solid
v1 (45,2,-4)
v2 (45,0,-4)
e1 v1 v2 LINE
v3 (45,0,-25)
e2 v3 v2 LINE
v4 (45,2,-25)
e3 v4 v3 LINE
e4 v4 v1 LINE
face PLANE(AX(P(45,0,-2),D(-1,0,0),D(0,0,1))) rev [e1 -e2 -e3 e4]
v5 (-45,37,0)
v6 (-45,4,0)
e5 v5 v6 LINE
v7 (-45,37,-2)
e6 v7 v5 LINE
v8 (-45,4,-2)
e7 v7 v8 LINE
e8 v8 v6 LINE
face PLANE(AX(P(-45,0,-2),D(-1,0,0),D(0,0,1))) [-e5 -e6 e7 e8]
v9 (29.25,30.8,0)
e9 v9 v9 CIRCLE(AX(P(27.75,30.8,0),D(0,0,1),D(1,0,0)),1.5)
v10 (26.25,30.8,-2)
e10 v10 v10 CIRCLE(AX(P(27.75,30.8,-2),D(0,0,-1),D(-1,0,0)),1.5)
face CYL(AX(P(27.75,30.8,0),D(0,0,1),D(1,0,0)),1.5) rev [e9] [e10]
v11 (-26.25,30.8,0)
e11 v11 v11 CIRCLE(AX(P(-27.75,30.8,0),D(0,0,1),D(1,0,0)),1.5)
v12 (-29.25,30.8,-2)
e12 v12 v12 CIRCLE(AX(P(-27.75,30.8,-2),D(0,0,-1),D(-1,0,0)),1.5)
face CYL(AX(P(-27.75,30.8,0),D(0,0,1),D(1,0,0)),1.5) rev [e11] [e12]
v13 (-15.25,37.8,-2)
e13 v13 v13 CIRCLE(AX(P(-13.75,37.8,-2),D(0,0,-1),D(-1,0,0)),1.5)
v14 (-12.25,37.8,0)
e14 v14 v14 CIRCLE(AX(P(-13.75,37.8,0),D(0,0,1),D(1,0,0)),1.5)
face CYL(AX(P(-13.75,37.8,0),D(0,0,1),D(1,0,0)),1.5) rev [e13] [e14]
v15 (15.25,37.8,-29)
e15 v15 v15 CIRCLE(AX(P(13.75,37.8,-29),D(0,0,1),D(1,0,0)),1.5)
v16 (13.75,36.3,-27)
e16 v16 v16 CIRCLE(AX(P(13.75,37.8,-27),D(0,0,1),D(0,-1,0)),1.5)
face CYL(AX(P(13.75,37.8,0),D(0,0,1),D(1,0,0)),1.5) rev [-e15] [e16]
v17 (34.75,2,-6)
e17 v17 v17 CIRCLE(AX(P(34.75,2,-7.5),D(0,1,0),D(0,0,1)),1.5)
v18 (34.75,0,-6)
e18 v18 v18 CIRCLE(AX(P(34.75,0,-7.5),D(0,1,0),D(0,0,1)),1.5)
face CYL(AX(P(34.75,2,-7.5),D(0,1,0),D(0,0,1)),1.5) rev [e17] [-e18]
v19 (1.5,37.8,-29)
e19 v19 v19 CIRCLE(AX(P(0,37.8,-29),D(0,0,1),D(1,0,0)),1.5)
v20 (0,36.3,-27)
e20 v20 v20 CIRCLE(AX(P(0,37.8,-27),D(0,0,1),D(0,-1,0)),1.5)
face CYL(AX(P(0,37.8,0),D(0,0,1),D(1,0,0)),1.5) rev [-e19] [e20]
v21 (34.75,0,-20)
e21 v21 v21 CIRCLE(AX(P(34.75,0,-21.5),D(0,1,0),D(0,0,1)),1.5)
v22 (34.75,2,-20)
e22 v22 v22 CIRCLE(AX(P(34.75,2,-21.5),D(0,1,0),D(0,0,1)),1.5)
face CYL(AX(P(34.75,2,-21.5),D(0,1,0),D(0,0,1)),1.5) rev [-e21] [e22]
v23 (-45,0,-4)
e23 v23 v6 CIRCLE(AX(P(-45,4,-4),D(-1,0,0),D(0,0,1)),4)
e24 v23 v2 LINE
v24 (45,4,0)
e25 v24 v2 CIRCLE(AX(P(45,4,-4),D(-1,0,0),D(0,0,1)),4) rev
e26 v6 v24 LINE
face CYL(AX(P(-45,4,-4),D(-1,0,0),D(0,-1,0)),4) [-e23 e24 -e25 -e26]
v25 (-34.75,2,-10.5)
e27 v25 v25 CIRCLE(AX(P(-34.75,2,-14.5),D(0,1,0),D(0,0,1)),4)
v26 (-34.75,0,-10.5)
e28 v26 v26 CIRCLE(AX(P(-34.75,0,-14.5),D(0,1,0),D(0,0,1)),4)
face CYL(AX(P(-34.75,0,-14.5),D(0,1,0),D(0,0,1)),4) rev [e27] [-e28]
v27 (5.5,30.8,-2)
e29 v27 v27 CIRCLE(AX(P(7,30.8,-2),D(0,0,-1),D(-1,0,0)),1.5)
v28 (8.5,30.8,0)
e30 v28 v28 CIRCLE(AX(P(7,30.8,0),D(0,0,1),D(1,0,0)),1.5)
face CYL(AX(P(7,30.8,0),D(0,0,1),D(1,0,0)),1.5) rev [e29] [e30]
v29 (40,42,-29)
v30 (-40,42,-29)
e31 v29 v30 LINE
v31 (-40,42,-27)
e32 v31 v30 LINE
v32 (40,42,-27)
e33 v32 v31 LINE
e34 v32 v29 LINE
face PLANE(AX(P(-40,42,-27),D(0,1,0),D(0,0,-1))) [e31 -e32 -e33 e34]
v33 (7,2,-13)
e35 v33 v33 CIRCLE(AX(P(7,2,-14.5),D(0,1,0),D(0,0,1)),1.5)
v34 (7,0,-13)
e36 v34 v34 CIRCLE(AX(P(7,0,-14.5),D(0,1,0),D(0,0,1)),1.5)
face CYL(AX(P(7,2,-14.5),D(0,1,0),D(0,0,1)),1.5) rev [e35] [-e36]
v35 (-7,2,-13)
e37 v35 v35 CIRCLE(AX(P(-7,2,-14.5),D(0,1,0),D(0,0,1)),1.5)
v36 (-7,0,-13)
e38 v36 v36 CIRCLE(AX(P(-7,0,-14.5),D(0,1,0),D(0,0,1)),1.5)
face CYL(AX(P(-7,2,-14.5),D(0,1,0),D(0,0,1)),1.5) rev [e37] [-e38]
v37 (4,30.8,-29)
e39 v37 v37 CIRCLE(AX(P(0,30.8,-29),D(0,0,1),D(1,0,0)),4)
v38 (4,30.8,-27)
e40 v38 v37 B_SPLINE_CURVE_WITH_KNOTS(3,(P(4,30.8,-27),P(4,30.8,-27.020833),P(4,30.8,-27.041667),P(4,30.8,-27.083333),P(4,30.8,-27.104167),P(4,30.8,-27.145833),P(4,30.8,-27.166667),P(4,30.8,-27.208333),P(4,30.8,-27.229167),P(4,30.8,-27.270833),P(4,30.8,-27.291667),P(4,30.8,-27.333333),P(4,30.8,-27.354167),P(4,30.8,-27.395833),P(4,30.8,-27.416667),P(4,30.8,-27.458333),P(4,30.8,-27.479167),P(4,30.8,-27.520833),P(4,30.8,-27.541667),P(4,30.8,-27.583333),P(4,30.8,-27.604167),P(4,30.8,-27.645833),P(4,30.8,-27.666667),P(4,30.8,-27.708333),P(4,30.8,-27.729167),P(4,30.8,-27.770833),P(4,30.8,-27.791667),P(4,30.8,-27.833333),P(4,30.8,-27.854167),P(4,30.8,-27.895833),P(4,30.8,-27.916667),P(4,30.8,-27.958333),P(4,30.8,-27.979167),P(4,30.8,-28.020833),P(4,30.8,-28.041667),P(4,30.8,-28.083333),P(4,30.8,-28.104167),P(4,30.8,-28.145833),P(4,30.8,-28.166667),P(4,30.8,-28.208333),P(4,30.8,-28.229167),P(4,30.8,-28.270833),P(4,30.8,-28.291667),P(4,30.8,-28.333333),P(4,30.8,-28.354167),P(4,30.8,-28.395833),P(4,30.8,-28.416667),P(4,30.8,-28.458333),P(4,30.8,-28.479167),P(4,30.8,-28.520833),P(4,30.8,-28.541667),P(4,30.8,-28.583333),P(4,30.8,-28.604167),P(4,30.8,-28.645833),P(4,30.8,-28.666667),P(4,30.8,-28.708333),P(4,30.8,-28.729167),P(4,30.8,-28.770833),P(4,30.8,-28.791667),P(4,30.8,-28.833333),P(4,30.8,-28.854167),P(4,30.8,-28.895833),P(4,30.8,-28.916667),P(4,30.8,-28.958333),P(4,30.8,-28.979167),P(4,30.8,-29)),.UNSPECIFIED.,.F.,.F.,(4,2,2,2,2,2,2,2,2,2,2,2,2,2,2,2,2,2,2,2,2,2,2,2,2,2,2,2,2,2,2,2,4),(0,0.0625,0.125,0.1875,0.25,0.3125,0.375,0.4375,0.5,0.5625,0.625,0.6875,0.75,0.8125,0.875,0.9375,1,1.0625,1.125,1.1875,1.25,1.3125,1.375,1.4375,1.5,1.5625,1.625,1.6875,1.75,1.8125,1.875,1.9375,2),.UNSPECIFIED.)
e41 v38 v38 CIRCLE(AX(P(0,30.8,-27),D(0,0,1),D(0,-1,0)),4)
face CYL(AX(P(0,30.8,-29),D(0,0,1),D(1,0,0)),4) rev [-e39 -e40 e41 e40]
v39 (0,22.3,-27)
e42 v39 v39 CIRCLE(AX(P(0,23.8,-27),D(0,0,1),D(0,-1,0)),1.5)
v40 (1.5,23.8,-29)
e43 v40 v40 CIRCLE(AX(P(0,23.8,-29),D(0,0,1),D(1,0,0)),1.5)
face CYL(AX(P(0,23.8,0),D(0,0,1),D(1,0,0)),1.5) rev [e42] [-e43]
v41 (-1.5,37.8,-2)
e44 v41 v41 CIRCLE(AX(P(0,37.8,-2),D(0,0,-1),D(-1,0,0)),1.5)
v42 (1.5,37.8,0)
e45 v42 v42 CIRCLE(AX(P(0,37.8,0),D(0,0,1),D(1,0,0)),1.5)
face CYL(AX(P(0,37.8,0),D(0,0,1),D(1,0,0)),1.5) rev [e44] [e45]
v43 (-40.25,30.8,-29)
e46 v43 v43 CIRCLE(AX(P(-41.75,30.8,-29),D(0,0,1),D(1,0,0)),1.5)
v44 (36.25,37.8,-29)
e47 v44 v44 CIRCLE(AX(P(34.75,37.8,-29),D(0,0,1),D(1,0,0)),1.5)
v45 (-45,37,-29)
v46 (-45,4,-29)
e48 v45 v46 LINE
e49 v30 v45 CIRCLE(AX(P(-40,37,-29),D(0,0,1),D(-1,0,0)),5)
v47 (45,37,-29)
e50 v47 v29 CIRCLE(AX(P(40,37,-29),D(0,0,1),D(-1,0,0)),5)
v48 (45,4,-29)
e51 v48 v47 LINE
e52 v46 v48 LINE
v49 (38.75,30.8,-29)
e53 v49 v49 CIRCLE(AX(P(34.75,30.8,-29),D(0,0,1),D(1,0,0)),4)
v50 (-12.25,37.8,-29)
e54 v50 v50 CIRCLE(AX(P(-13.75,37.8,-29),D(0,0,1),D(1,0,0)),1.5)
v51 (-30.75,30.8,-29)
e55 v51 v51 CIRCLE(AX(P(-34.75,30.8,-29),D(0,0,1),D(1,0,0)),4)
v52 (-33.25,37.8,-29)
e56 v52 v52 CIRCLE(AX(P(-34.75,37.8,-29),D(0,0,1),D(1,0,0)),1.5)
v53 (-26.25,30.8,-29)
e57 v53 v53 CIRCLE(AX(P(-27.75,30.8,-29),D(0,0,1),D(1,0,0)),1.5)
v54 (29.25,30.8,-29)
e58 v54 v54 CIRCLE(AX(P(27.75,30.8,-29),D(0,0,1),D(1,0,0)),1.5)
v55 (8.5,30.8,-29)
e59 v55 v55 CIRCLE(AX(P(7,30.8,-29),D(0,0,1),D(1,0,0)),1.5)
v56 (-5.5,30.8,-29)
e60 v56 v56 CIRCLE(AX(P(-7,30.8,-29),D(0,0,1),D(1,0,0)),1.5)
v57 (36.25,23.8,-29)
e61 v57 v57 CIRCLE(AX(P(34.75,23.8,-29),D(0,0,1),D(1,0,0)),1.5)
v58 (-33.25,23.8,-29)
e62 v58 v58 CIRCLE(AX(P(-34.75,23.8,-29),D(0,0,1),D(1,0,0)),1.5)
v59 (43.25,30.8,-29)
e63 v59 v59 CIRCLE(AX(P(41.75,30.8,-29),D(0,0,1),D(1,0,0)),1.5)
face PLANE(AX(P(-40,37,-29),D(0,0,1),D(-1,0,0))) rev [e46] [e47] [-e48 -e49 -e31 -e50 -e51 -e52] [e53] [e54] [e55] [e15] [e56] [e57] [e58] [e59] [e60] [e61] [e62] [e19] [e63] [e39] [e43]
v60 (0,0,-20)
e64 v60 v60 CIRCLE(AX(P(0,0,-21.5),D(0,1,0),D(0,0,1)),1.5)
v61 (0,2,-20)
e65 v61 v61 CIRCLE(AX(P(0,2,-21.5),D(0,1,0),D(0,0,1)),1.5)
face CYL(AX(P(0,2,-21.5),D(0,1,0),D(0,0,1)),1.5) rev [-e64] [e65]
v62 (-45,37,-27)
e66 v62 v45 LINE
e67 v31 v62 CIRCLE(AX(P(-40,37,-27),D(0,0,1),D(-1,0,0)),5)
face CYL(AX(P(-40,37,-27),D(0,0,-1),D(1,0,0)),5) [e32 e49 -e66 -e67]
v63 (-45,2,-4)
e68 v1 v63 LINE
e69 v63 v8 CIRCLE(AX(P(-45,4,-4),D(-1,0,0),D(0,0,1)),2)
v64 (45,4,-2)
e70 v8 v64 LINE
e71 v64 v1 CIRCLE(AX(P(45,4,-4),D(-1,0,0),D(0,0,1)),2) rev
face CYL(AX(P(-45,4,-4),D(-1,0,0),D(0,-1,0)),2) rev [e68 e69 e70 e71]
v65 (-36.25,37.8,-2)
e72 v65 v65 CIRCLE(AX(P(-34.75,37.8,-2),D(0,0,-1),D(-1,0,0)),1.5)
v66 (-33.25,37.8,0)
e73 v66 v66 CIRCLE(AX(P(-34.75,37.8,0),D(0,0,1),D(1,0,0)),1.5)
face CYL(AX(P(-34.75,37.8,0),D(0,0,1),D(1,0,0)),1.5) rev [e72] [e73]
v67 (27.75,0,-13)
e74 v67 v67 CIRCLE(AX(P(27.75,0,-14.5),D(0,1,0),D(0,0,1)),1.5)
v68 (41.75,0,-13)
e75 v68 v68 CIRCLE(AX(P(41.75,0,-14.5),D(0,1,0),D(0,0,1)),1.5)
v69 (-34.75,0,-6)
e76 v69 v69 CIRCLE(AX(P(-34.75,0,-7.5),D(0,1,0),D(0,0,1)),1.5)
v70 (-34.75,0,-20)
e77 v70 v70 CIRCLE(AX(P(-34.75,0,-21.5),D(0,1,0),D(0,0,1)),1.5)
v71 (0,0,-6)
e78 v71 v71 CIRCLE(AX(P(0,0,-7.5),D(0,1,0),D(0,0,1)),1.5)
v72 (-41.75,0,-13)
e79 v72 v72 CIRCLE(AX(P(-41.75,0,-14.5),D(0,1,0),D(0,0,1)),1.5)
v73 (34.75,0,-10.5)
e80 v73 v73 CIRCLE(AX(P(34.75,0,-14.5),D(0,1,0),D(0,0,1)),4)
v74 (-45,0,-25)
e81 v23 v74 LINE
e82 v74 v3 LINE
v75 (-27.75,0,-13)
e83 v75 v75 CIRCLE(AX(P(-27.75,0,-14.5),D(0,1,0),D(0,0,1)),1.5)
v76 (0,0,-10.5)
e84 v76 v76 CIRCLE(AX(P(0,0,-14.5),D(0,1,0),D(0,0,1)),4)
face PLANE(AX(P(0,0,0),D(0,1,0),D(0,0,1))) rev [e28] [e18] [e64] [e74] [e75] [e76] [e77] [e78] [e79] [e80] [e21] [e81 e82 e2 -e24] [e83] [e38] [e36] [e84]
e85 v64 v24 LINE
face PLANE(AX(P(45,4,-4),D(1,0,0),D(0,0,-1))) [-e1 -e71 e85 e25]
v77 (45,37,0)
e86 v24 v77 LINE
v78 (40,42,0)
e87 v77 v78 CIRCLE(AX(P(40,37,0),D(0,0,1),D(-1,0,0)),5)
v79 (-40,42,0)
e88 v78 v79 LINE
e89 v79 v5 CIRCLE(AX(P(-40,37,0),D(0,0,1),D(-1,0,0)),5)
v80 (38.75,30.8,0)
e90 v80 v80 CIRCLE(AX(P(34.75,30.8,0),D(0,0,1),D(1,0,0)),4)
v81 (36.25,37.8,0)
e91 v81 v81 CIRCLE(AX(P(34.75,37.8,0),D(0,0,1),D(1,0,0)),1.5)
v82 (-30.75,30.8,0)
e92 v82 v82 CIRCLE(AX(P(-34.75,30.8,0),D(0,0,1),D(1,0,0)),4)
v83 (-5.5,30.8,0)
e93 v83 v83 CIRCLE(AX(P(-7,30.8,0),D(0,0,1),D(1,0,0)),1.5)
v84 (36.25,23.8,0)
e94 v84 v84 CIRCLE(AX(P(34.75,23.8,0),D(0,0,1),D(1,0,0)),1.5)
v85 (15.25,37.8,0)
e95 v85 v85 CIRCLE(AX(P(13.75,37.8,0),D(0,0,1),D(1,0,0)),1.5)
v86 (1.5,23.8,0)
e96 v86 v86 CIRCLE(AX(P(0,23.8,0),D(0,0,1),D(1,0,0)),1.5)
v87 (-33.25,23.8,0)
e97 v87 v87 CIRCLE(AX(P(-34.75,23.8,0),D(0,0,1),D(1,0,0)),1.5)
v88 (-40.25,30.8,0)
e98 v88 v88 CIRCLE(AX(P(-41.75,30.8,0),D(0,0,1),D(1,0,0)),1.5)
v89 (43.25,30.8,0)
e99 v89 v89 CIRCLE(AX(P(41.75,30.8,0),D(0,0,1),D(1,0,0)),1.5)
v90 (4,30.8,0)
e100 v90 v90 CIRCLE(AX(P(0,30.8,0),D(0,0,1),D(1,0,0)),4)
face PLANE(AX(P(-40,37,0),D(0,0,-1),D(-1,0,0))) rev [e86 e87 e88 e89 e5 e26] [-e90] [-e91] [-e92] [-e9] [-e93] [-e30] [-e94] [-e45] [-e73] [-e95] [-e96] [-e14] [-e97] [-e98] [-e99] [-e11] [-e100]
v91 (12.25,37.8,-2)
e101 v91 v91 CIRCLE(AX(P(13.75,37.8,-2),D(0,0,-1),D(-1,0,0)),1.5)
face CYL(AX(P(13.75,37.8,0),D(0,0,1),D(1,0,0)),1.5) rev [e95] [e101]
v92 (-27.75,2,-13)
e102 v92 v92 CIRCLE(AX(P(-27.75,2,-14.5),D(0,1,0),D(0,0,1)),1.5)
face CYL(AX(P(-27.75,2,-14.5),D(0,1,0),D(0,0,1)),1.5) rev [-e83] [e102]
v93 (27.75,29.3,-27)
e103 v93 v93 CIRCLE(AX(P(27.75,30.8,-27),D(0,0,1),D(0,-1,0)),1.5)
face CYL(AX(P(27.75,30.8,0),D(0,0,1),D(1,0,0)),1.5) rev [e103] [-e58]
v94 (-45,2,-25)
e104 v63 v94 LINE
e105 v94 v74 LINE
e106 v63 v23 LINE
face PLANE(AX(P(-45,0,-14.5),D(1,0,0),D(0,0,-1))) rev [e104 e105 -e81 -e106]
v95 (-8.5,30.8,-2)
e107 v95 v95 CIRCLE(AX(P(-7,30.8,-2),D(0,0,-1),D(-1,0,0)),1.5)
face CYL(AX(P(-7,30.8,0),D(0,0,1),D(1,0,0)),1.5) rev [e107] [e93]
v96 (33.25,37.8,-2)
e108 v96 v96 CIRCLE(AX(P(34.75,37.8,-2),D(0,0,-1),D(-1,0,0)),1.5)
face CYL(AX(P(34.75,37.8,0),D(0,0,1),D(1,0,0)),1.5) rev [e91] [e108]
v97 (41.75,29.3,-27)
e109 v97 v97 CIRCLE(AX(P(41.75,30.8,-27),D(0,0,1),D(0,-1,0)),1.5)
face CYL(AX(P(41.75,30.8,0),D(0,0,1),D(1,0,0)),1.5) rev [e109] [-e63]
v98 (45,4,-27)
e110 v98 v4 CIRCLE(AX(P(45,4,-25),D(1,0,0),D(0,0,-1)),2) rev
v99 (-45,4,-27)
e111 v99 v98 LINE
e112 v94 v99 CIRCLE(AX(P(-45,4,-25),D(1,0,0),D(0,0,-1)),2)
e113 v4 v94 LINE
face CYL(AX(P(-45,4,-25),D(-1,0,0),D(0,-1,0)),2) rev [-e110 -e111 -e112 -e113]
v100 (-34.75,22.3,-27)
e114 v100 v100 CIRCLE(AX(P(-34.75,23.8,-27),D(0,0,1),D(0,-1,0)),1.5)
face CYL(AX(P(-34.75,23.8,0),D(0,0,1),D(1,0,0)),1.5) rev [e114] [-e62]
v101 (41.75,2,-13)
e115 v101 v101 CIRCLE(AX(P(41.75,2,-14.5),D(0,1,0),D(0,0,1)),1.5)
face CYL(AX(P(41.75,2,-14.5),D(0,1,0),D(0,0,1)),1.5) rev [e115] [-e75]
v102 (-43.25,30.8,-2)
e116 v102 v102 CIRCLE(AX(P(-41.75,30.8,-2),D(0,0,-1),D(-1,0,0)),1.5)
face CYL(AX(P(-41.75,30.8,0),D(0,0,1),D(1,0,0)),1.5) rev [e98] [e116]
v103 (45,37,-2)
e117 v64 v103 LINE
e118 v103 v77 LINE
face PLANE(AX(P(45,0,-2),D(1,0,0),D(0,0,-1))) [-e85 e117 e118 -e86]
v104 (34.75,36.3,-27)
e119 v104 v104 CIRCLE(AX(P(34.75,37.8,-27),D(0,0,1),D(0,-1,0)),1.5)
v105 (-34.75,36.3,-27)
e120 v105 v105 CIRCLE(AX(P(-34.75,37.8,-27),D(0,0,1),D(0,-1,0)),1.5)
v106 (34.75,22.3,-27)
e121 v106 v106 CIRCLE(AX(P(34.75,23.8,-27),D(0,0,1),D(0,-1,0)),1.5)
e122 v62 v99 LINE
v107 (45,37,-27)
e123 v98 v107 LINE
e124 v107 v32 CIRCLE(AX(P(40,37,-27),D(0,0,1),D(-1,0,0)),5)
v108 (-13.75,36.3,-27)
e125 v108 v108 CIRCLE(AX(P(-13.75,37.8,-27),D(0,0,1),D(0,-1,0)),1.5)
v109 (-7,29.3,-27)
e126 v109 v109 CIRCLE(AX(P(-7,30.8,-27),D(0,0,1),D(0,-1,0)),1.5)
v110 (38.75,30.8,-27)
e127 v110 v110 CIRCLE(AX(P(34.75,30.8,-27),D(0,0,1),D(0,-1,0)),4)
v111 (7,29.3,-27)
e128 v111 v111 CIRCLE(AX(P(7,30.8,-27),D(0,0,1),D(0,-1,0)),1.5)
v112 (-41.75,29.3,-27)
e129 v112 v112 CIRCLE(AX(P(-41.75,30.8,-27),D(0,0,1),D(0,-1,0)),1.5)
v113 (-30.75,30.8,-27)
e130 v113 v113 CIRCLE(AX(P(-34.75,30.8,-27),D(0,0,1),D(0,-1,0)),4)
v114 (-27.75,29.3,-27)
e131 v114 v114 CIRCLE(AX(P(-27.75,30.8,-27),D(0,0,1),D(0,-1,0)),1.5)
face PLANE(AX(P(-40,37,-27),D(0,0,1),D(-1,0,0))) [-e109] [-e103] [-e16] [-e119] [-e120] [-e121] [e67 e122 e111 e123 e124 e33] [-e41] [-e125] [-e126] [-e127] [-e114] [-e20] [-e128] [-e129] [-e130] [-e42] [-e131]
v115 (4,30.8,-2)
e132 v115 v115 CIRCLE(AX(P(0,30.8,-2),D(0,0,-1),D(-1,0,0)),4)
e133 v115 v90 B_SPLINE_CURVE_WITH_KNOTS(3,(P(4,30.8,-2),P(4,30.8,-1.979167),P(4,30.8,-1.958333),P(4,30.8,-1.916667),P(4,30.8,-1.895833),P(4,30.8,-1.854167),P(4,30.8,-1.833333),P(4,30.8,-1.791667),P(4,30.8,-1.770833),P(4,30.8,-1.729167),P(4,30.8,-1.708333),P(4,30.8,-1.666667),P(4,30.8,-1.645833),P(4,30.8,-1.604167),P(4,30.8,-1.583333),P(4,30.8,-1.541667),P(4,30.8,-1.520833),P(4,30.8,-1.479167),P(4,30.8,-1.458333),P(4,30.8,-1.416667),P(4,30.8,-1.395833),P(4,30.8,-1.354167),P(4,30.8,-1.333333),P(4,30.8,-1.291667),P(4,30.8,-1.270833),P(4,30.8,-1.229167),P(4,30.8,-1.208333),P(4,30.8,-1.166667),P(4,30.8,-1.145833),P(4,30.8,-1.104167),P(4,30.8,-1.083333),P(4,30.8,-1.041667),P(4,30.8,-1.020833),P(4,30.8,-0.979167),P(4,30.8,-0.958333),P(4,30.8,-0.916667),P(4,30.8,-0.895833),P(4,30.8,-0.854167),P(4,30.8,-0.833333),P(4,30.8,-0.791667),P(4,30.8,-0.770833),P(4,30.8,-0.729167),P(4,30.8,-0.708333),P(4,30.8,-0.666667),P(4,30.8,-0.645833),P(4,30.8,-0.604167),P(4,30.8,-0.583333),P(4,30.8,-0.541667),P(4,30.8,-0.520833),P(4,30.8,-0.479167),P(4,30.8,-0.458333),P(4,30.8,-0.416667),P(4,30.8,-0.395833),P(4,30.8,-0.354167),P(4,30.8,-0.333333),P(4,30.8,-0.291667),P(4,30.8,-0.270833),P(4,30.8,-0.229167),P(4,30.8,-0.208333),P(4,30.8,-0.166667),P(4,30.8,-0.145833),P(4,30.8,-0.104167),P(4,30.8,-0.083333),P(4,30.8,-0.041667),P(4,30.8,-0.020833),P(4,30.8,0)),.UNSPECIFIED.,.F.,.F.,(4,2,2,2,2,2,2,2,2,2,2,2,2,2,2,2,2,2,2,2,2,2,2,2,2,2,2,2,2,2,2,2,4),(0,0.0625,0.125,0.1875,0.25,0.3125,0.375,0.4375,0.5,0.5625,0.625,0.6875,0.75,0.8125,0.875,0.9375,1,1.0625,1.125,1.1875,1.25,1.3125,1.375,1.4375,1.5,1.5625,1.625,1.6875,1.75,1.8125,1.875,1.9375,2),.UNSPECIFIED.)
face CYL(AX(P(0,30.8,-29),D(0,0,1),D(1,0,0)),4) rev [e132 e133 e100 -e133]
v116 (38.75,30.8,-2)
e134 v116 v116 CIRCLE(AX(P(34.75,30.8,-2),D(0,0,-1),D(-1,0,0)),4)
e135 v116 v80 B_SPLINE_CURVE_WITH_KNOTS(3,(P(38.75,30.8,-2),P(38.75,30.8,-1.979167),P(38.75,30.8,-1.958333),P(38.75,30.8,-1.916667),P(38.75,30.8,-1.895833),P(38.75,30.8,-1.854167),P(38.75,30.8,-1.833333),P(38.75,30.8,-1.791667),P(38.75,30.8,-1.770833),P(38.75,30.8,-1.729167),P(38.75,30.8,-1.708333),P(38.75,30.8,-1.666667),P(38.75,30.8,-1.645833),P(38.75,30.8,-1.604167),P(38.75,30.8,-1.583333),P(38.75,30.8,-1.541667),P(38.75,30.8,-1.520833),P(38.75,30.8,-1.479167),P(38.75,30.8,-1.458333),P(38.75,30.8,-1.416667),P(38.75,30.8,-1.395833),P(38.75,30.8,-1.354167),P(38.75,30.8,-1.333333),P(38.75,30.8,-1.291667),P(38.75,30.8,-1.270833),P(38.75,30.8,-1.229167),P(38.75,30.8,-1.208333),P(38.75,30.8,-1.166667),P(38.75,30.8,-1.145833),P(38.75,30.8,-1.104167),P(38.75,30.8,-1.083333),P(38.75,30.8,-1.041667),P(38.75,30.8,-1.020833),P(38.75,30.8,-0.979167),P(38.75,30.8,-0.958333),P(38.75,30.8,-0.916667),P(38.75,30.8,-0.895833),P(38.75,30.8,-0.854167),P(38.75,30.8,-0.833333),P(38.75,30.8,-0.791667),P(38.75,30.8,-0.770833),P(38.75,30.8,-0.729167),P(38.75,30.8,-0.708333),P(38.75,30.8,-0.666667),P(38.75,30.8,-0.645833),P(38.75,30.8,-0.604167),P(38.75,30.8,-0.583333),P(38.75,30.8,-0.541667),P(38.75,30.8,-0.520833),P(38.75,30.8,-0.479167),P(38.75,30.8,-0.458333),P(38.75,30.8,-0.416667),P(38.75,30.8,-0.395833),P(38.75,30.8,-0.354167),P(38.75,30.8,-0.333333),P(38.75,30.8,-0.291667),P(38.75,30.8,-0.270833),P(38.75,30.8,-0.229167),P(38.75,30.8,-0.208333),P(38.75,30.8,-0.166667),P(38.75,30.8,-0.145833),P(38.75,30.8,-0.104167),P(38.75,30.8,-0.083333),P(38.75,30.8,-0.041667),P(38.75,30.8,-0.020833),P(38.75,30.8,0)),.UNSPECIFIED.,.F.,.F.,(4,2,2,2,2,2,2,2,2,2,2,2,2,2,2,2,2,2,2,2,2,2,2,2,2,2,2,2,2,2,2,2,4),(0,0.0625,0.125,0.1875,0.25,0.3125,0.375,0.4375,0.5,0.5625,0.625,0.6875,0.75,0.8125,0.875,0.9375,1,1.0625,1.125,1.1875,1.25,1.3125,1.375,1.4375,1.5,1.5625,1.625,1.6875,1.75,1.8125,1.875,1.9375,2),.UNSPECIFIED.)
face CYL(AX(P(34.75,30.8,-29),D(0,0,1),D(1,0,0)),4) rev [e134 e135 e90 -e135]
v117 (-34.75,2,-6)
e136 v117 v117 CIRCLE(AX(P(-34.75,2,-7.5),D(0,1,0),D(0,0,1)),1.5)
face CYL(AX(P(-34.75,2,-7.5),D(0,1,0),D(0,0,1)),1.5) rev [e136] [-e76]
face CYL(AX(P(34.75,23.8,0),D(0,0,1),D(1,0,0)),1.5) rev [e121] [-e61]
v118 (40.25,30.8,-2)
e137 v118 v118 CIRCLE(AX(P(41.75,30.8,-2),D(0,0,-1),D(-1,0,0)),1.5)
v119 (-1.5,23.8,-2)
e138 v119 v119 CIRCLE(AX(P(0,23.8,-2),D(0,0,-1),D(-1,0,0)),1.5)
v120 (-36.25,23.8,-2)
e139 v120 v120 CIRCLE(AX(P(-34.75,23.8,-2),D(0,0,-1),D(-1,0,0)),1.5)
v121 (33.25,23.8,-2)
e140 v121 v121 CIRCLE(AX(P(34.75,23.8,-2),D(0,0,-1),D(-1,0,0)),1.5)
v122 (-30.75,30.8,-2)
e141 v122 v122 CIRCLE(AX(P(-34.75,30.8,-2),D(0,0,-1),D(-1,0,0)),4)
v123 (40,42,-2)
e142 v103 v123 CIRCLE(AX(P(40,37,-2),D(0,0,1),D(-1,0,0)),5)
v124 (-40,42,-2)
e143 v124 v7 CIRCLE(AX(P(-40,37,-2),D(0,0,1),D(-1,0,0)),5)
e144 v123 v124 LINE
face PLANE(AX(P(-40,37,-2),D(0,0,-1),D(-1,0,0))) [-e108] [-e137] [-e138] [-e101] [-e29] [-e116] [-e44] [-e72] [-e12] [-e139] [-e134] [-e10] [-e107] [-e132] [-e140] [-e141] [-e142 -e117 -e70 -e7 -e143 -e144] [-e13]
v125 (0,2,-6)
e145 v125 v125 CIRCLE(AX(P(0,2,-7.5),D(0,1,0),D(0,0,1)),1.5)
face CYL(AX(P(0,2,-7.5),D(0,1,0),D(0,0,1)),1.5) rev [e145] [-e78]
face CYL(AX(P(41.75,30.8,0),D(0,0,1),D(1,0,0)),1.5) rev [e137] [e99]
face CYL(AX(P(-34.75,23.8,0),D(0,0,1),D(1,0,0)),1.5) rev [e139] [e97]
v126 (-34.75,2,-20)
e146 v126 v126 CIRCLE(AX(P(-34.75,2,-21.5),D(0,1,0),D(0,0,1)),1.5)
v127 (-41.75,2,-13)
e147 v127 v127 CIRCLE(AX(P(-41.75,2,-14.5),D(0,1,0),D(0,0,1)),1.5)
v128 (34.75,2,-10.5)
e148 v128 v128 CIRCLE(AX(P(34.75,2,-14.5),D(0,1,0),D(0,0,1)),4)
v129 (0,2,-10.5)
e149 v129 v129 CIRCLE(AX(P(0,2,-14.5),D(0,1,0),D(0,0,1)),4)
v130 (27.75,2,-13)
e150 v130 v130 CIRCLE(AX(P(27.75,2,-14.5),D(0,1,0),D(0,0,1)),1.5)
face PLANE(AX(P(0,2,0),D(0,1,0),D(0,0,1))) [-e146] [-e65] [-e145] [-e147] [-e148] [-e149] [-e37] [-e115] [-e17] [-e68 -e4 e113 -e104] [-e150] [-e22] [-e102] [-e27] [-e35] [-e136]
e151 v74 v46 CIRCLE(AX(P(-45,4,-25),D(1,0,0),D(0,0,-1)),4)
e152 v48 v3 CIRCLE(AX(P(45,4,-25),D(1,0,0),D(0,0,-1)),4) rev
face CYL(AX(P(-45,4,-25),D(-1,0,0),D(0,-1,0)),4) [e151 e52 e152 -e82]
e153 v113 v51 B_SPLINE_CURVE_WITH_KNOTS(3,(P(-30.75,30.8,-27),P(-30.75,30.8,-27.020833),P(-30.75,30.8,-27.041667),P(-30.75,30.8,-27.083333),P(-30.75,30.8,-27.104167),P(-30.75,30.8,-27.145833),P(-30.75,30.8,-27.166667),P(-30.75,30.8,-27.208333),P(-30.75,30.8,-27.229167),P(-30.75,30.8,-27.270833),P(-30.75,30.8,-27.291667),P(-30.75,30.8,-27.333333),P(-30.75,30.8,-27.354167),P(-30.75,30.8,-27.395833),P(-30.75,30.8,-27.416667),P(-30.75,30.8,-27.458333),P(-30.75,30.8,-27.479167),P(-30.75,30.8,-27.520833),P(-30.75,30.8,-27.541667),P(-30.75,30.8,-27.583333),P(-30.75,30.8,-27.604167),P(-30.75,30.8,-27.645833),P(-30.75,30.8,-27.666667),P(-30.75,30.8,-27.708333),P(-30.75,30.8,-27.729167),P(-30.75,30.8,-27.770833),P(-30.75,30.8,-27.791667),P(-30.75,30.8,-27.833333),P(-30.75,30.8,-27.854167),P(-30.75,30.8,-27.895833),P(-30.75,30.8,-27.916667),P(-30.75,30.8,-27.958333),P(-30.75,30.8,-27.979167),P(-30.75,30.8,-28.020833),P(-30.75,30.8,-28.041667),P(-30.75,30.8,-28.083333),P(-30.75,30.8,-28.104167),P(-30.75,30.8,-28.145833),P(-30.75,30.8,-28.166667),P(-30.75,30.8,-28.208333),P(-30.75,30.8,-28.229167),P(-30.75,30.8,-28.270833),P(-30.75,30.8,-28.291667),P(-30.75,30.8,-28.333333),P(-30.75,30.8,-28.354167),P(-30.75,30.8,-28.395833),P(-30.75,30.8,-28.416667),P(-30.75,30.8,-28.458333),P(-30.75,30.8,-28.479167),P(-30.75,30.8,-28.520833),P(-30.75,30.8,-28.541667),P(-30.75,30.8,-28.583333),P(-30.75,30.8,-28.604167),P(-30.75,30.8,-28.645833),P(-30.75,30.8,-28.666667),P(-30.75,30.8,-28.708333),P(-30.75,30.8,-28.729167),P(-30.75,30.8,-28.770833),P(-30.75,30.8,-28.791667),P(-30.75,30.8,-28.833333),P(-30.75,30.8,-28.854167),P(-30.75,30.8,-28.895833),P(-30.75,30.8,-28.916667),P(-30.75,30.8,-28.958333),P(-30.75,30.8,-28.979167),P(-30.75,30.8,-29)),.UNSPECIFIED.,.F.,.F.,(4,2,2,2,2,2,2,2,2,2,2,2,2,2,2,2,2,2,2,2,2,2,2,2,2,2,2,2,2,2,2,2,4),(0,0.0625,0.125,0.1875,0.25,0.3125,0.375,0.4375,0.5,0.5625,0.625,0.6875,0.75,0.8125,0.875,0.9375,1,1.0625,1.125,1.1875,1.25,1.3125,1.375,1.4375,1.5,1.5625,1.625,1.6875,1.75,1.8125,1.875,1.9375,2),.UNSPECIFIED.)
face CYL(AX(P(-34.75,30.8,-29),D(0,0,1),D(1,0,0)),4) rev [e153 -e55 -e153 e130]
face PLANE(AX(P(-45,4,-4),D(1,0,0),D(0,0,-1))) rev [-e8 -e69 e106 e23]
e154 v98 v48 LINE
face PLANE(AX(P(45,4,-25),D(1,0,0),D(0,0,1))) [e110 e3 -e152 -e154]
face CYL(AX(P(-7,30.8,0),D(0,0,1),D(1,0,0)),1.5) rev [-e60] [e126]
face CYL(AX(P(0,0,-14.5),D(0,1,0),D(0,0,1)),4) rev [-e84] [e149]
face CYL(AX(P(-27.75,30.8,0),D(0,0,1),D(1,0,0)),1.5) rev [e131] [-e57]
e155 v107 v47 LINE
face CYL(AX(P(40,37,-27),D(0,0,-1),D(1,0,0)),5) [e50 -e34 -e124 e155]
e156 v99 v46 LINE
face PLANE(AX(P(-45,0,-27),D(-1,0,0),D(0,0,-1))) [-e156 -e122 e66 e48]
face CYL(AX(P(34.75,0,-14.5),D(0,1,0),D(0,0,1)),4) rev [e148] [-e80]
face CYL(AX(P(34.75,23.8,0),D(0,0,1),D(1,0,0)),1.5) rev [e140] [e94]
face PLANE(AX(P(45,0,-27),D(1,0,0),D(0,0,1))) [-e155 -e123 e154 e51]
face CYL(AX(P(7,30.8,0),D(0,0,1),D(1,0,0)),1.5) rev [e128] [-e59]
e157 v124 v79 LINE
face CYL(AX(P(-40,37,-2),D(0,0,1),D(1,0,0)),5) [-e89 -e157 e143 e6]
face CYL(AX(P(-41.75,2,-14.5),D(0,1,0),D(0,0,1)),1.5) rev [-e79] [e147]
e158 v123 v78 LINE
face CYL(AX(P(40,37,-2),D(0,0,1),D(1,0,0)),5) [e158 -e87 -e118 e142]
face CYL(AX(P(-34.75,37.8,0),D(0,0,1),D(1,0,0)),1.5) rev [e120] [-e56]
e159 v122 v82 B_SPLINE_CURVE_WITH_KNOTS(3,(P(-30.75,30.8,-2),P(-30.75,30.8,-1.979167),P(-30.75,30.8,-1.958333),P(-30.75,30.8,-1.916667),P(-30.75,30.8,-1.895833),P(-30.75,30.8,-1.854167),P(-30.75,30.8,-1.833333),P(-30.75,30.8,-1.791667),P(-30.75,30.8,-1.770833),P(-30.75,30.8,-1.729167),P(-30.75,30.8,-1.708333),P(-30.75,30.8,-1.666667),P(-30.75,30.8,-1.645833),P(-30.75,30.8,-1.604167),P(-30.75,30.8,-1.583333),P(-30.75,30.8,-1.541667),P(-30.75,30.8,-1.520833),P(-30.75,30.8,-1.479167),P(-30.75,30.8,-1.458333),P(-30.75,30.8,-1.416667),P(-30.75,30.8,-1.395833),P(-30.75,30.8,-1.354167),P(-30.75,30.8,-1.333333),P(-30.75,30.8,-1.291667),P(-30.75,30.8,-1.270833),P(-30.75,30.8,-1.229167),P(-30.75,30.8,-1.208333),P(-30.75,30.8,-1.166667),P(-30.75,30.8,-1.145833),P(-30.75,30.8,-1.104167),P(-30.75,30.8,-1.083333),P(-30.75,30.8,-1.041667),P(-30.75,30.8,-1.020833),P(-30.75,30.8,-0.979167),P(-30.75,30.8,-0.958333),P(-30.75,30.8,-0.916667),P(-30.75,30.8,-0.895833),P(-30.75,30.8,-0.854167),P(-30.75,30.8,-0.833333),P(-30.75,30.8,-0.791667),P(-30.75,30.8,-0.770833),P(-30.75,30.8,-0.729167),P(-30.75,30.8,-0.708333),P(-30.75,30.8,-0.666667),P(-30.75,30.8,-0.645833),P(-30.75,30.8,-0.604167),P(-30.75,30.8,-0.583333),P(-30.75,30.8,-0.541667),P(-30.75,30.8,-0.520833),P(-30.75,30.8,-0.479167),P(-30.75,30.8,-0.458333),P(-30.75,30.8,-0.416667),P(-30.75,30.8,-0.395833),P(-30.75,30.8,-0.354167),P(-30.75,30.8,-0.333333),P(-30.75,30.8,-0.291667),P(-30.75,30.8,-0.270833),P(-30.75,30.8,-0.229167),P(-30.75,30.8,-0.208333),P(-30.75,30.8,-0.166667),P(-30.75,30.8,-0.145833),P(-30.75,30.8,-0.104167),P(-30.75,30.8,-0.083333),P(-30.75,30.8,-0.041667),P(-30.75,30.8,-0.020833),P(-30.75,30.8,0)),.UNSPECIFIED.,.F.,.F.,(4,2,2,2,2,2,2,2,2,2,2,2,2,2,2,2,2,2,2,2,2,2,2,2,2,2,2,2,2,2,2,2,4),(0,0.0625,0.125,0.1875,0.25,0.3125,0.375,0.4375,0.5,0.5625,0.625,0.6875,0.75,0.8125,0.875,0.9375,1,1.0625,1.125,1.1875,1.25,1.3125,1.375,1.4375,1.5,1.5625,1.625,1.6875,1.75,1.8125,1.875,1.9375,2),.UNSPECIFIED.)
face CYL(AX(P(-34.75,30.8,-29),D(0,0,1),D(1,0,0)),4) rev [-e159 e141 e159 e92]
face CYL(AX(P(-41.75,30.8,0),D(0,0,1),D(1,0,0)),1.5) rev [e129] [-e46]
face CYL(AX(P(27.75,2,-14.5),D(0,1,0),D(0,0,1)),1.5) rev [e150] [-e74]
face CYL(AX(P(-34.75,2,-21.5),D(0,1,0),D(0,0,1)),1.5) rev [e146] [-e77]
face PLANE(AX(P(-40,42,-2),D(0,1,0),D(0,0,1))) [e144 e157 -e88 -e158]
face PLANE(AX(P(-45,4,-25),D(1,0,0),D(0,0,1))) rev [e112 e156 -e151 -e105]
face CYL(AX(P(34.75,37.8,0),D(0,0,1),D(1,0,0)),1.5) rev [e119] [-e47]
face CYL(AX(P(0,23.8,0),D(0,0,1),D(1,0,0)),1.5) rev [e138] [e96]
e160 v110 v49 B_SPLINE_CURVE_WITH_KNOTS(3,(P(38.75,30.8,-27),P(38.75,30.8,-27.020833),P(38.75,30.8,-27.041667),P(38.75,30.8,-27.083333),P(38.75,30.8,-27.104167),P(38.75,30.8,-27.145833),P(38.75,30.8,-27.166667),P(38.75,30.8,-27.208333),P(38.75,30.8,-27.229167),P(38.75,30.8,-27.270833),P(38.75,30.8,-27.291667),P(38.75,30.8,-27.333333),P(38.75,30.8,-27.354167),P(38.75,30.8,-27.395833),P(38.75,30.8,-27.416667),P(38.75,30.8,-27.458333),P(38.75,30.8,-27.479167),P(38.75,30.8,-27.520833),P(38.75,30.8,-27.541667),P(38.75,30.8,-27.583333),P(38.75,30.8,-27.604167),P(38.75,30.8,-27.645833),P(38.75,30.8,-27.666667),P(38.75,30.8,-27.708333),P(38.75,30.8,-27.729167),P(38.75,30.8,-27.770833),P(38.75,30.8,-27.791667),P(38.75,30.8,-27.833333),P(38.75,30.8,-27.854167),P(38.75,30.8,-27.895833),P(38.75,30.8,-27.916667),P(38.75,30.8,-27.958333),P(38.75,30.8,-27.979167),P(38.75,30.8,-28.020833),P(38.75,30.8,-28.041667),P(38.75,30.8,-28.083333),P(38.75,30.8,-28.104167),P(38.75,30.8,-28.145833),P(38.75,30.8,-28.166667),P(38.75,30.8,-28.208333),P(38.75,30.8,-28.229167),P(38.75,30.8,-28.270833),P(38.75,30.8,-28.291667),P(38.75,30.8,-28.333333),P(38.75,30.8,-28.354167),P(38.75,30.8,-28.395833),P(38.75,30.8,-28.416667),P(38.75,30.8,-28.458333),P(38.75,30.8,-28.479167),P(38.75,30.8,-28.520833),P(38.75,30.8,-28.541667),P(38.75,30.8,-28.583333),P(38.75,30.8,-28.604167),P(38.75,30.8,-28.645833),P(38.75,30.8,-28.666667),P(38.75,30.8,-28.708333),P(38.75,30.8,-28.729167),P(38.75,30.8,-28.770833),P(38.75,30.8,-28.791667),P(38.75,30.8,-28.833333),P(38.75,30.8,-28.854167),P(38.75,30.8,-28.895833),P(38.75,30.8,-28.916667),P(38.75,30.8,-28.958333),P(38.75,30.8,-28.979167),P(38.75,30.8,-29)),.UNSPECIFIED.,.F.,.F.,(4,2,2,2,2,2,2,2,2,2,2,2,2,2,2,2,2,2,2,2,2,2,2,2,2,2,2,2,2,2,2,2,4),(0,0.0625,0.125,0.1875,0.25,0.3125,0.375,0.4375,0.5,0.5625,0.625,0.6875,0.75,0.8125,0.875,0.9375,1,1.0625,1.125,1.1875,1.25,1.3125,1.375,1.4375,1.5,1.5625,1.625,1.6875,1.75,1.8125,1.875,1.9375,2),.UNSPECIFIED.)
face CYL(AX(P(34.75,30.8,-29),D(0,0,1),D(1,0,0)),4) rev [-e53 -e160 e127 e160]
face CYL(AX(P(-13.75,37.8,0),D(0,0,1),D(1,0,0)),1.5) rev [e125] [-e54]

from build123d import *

# Parameters (mm, degrees)
BASE_FLANGE1_DEPTH           = 2
EDGE_FLANGE1_STRIP_W         = 12
EDGE_FLANGE1_STRIP_H         = 2
EDGE_FLANGE1_STRIP_CUT_DEPTH = 90
EDGE_FLANGE1_DEPTH           = 90
SKETCH11_R                   = 4
CUT_EXTRUDE1_DEPTH           = 69.044103345
M3X0_5_TAPPED_HOLE1_D        = 3
SKETCH14_R                   = 4
CUT_EXTRUDE2_DEPTH           = 67.828137786
M3X0_5_TAPPED_HOLE2_D        = 3


# Sheet-metal steps are written as plain solids
with BuildPart() as part:
    # Sketch1 → Base-Flange1 (new body)
    with BuildSketch(Plane.XY):
        with BuildLine():
            Line((-45, 0), (45, 0))
            Line((45, 0), (45, 37))
            ThreePointArc((45, 37), (43.535533906, 40.535533906), (40, 42))
            Line((40, 42), (-40, 42))
            ThreePointArc((-40, 42), (-43.535533906, 40.535533906), (-45, 37))
            Line((-45, 37), (-45, 0))
        make_face()
    extrude(amount=-BASE_FLANGE1_DEPTH)

    # Edge-Flange1 strip (across the edge) → Edge-Flange1 strip cut (cut)
    with BuildSketch(Plane(origin=(45, 0, -2), x_dir=(0, 1, 0), z_dir=(-1, 0, 0))):
        with Locations((-2, -1)):
            Rectangle(EDGE_FLANGE1_STRIP_W, EDGE_FLANGE1_STRIP_H)
    extrude(amount=EDGE_FLANGE1_STRIP_CUT_DEPTH, mode=Mode.SUBTRACT)

    # Edge-Flange1 section (across the edge) → Edge-Flange1 (add)
    with BuildSketch(Plane(origin=(45, 0, -2), x_dir=(0, 1, 0), z_dir=(-1, 0, 0))):
        with BuildLine():
            Line((0, 2), (0, 12.5))
            Line((0, 12.5), (2, 12.5))
            Line((2, 12.5), (2, 2))
            ThreePointArc((2, 2), (2.585786438, 0.585786438), (4, 0))
            Line((4, 0), (4, -2))
            ThreePointArc((4, -2), (1.171572875, -0.828427125), (0, 2))
        make_face()
    extrude(amount=EDGE_FLANGE1_DEPTH)

    # Mirror1: part across plane


with BuildPart() as part_1:
    add(part.part)
    add(part.part.mirror(Plane(origin=(45, 0, -14.5), x_dir=(1, 0, 0), z_dir=(0, 0, 1))))

    # Sketch11 → Cut-Extrude1 (cut, through all)
    with BuildSketch(Plane.XY):
        with Locations((-34.75, 30.8)):
            Circle(SKETCH11_R)
        with Locations((0, 30.8)):
            Circle(SKETCH11_R)
        with Locations((34.75, 30.8)):
            Circle(SKETCH11_R)
    extrude(amount=-CUT_EXTRUDE1_DEPTH, mode=Mode.SUBTRACT)

    # M3x0.5 Tapped Hole1 (through all)
    with Locations(Plane.XY):
        with Locations((-34.75, 37.8), (-34.75, 23.8), (-27.75, 30.8), (-41.75, 30.8), (0, 37.8), (0, 23.8), (-7, 30.8), (7, 30.8), (34.75, 37.8), (34.75, 23.8), (41.75, 30.8), (27.75, 30.8), (-13.75, 37.8), (13.75, 37.8)):
            Hole(M3X0_5_TAPPED_HOLE1_D / 2)

    # Sketch14 → Cut-Extrude2 (cut, through all)
    with BuildSketch(Plane(origin=(0, 2, 0), x_dir=(1, 0, 0), z_dir=(0, 1, 0))):
        with Locations(Location((-34.75, 14.5, 0), (0, 0, 270))):
            Circle(SKETCH14_R)
        with Locations(Location((0, 14.5, 0), (0, 0, 270))):
            Circle(SKETCH14_R)
        with Locations(Location((34.75, 14.5, 0), (0, 0, 270))):
            Circle(SKETCH14_R)
    extrude(amount=-CUT_EXTRUDE2_DEPTH, mode=Mode.SUBTRACT)

    # M3x0.5 Tapped Hole2 (through all)
    with Locations(Plane(origin=(0, 2, 0), x_dir=(1, 0, 0), z_dir=(0, 1, 0))):
        with Locations((-34.75, 21.5), (-34.75, 7.5), (-41.75, 14.5), (-27.75, 14.5), (0, 21.5), (0, 7.5), (-7, 14.5), (7, 14.5), (34.75, 21.5), (34.75, 7.5), (41.75, 14.5), (27.75, 14.5)):
            Hole(M3X0_5_TAPPED_HOLE2_D / 2)


solid = part_1.part
